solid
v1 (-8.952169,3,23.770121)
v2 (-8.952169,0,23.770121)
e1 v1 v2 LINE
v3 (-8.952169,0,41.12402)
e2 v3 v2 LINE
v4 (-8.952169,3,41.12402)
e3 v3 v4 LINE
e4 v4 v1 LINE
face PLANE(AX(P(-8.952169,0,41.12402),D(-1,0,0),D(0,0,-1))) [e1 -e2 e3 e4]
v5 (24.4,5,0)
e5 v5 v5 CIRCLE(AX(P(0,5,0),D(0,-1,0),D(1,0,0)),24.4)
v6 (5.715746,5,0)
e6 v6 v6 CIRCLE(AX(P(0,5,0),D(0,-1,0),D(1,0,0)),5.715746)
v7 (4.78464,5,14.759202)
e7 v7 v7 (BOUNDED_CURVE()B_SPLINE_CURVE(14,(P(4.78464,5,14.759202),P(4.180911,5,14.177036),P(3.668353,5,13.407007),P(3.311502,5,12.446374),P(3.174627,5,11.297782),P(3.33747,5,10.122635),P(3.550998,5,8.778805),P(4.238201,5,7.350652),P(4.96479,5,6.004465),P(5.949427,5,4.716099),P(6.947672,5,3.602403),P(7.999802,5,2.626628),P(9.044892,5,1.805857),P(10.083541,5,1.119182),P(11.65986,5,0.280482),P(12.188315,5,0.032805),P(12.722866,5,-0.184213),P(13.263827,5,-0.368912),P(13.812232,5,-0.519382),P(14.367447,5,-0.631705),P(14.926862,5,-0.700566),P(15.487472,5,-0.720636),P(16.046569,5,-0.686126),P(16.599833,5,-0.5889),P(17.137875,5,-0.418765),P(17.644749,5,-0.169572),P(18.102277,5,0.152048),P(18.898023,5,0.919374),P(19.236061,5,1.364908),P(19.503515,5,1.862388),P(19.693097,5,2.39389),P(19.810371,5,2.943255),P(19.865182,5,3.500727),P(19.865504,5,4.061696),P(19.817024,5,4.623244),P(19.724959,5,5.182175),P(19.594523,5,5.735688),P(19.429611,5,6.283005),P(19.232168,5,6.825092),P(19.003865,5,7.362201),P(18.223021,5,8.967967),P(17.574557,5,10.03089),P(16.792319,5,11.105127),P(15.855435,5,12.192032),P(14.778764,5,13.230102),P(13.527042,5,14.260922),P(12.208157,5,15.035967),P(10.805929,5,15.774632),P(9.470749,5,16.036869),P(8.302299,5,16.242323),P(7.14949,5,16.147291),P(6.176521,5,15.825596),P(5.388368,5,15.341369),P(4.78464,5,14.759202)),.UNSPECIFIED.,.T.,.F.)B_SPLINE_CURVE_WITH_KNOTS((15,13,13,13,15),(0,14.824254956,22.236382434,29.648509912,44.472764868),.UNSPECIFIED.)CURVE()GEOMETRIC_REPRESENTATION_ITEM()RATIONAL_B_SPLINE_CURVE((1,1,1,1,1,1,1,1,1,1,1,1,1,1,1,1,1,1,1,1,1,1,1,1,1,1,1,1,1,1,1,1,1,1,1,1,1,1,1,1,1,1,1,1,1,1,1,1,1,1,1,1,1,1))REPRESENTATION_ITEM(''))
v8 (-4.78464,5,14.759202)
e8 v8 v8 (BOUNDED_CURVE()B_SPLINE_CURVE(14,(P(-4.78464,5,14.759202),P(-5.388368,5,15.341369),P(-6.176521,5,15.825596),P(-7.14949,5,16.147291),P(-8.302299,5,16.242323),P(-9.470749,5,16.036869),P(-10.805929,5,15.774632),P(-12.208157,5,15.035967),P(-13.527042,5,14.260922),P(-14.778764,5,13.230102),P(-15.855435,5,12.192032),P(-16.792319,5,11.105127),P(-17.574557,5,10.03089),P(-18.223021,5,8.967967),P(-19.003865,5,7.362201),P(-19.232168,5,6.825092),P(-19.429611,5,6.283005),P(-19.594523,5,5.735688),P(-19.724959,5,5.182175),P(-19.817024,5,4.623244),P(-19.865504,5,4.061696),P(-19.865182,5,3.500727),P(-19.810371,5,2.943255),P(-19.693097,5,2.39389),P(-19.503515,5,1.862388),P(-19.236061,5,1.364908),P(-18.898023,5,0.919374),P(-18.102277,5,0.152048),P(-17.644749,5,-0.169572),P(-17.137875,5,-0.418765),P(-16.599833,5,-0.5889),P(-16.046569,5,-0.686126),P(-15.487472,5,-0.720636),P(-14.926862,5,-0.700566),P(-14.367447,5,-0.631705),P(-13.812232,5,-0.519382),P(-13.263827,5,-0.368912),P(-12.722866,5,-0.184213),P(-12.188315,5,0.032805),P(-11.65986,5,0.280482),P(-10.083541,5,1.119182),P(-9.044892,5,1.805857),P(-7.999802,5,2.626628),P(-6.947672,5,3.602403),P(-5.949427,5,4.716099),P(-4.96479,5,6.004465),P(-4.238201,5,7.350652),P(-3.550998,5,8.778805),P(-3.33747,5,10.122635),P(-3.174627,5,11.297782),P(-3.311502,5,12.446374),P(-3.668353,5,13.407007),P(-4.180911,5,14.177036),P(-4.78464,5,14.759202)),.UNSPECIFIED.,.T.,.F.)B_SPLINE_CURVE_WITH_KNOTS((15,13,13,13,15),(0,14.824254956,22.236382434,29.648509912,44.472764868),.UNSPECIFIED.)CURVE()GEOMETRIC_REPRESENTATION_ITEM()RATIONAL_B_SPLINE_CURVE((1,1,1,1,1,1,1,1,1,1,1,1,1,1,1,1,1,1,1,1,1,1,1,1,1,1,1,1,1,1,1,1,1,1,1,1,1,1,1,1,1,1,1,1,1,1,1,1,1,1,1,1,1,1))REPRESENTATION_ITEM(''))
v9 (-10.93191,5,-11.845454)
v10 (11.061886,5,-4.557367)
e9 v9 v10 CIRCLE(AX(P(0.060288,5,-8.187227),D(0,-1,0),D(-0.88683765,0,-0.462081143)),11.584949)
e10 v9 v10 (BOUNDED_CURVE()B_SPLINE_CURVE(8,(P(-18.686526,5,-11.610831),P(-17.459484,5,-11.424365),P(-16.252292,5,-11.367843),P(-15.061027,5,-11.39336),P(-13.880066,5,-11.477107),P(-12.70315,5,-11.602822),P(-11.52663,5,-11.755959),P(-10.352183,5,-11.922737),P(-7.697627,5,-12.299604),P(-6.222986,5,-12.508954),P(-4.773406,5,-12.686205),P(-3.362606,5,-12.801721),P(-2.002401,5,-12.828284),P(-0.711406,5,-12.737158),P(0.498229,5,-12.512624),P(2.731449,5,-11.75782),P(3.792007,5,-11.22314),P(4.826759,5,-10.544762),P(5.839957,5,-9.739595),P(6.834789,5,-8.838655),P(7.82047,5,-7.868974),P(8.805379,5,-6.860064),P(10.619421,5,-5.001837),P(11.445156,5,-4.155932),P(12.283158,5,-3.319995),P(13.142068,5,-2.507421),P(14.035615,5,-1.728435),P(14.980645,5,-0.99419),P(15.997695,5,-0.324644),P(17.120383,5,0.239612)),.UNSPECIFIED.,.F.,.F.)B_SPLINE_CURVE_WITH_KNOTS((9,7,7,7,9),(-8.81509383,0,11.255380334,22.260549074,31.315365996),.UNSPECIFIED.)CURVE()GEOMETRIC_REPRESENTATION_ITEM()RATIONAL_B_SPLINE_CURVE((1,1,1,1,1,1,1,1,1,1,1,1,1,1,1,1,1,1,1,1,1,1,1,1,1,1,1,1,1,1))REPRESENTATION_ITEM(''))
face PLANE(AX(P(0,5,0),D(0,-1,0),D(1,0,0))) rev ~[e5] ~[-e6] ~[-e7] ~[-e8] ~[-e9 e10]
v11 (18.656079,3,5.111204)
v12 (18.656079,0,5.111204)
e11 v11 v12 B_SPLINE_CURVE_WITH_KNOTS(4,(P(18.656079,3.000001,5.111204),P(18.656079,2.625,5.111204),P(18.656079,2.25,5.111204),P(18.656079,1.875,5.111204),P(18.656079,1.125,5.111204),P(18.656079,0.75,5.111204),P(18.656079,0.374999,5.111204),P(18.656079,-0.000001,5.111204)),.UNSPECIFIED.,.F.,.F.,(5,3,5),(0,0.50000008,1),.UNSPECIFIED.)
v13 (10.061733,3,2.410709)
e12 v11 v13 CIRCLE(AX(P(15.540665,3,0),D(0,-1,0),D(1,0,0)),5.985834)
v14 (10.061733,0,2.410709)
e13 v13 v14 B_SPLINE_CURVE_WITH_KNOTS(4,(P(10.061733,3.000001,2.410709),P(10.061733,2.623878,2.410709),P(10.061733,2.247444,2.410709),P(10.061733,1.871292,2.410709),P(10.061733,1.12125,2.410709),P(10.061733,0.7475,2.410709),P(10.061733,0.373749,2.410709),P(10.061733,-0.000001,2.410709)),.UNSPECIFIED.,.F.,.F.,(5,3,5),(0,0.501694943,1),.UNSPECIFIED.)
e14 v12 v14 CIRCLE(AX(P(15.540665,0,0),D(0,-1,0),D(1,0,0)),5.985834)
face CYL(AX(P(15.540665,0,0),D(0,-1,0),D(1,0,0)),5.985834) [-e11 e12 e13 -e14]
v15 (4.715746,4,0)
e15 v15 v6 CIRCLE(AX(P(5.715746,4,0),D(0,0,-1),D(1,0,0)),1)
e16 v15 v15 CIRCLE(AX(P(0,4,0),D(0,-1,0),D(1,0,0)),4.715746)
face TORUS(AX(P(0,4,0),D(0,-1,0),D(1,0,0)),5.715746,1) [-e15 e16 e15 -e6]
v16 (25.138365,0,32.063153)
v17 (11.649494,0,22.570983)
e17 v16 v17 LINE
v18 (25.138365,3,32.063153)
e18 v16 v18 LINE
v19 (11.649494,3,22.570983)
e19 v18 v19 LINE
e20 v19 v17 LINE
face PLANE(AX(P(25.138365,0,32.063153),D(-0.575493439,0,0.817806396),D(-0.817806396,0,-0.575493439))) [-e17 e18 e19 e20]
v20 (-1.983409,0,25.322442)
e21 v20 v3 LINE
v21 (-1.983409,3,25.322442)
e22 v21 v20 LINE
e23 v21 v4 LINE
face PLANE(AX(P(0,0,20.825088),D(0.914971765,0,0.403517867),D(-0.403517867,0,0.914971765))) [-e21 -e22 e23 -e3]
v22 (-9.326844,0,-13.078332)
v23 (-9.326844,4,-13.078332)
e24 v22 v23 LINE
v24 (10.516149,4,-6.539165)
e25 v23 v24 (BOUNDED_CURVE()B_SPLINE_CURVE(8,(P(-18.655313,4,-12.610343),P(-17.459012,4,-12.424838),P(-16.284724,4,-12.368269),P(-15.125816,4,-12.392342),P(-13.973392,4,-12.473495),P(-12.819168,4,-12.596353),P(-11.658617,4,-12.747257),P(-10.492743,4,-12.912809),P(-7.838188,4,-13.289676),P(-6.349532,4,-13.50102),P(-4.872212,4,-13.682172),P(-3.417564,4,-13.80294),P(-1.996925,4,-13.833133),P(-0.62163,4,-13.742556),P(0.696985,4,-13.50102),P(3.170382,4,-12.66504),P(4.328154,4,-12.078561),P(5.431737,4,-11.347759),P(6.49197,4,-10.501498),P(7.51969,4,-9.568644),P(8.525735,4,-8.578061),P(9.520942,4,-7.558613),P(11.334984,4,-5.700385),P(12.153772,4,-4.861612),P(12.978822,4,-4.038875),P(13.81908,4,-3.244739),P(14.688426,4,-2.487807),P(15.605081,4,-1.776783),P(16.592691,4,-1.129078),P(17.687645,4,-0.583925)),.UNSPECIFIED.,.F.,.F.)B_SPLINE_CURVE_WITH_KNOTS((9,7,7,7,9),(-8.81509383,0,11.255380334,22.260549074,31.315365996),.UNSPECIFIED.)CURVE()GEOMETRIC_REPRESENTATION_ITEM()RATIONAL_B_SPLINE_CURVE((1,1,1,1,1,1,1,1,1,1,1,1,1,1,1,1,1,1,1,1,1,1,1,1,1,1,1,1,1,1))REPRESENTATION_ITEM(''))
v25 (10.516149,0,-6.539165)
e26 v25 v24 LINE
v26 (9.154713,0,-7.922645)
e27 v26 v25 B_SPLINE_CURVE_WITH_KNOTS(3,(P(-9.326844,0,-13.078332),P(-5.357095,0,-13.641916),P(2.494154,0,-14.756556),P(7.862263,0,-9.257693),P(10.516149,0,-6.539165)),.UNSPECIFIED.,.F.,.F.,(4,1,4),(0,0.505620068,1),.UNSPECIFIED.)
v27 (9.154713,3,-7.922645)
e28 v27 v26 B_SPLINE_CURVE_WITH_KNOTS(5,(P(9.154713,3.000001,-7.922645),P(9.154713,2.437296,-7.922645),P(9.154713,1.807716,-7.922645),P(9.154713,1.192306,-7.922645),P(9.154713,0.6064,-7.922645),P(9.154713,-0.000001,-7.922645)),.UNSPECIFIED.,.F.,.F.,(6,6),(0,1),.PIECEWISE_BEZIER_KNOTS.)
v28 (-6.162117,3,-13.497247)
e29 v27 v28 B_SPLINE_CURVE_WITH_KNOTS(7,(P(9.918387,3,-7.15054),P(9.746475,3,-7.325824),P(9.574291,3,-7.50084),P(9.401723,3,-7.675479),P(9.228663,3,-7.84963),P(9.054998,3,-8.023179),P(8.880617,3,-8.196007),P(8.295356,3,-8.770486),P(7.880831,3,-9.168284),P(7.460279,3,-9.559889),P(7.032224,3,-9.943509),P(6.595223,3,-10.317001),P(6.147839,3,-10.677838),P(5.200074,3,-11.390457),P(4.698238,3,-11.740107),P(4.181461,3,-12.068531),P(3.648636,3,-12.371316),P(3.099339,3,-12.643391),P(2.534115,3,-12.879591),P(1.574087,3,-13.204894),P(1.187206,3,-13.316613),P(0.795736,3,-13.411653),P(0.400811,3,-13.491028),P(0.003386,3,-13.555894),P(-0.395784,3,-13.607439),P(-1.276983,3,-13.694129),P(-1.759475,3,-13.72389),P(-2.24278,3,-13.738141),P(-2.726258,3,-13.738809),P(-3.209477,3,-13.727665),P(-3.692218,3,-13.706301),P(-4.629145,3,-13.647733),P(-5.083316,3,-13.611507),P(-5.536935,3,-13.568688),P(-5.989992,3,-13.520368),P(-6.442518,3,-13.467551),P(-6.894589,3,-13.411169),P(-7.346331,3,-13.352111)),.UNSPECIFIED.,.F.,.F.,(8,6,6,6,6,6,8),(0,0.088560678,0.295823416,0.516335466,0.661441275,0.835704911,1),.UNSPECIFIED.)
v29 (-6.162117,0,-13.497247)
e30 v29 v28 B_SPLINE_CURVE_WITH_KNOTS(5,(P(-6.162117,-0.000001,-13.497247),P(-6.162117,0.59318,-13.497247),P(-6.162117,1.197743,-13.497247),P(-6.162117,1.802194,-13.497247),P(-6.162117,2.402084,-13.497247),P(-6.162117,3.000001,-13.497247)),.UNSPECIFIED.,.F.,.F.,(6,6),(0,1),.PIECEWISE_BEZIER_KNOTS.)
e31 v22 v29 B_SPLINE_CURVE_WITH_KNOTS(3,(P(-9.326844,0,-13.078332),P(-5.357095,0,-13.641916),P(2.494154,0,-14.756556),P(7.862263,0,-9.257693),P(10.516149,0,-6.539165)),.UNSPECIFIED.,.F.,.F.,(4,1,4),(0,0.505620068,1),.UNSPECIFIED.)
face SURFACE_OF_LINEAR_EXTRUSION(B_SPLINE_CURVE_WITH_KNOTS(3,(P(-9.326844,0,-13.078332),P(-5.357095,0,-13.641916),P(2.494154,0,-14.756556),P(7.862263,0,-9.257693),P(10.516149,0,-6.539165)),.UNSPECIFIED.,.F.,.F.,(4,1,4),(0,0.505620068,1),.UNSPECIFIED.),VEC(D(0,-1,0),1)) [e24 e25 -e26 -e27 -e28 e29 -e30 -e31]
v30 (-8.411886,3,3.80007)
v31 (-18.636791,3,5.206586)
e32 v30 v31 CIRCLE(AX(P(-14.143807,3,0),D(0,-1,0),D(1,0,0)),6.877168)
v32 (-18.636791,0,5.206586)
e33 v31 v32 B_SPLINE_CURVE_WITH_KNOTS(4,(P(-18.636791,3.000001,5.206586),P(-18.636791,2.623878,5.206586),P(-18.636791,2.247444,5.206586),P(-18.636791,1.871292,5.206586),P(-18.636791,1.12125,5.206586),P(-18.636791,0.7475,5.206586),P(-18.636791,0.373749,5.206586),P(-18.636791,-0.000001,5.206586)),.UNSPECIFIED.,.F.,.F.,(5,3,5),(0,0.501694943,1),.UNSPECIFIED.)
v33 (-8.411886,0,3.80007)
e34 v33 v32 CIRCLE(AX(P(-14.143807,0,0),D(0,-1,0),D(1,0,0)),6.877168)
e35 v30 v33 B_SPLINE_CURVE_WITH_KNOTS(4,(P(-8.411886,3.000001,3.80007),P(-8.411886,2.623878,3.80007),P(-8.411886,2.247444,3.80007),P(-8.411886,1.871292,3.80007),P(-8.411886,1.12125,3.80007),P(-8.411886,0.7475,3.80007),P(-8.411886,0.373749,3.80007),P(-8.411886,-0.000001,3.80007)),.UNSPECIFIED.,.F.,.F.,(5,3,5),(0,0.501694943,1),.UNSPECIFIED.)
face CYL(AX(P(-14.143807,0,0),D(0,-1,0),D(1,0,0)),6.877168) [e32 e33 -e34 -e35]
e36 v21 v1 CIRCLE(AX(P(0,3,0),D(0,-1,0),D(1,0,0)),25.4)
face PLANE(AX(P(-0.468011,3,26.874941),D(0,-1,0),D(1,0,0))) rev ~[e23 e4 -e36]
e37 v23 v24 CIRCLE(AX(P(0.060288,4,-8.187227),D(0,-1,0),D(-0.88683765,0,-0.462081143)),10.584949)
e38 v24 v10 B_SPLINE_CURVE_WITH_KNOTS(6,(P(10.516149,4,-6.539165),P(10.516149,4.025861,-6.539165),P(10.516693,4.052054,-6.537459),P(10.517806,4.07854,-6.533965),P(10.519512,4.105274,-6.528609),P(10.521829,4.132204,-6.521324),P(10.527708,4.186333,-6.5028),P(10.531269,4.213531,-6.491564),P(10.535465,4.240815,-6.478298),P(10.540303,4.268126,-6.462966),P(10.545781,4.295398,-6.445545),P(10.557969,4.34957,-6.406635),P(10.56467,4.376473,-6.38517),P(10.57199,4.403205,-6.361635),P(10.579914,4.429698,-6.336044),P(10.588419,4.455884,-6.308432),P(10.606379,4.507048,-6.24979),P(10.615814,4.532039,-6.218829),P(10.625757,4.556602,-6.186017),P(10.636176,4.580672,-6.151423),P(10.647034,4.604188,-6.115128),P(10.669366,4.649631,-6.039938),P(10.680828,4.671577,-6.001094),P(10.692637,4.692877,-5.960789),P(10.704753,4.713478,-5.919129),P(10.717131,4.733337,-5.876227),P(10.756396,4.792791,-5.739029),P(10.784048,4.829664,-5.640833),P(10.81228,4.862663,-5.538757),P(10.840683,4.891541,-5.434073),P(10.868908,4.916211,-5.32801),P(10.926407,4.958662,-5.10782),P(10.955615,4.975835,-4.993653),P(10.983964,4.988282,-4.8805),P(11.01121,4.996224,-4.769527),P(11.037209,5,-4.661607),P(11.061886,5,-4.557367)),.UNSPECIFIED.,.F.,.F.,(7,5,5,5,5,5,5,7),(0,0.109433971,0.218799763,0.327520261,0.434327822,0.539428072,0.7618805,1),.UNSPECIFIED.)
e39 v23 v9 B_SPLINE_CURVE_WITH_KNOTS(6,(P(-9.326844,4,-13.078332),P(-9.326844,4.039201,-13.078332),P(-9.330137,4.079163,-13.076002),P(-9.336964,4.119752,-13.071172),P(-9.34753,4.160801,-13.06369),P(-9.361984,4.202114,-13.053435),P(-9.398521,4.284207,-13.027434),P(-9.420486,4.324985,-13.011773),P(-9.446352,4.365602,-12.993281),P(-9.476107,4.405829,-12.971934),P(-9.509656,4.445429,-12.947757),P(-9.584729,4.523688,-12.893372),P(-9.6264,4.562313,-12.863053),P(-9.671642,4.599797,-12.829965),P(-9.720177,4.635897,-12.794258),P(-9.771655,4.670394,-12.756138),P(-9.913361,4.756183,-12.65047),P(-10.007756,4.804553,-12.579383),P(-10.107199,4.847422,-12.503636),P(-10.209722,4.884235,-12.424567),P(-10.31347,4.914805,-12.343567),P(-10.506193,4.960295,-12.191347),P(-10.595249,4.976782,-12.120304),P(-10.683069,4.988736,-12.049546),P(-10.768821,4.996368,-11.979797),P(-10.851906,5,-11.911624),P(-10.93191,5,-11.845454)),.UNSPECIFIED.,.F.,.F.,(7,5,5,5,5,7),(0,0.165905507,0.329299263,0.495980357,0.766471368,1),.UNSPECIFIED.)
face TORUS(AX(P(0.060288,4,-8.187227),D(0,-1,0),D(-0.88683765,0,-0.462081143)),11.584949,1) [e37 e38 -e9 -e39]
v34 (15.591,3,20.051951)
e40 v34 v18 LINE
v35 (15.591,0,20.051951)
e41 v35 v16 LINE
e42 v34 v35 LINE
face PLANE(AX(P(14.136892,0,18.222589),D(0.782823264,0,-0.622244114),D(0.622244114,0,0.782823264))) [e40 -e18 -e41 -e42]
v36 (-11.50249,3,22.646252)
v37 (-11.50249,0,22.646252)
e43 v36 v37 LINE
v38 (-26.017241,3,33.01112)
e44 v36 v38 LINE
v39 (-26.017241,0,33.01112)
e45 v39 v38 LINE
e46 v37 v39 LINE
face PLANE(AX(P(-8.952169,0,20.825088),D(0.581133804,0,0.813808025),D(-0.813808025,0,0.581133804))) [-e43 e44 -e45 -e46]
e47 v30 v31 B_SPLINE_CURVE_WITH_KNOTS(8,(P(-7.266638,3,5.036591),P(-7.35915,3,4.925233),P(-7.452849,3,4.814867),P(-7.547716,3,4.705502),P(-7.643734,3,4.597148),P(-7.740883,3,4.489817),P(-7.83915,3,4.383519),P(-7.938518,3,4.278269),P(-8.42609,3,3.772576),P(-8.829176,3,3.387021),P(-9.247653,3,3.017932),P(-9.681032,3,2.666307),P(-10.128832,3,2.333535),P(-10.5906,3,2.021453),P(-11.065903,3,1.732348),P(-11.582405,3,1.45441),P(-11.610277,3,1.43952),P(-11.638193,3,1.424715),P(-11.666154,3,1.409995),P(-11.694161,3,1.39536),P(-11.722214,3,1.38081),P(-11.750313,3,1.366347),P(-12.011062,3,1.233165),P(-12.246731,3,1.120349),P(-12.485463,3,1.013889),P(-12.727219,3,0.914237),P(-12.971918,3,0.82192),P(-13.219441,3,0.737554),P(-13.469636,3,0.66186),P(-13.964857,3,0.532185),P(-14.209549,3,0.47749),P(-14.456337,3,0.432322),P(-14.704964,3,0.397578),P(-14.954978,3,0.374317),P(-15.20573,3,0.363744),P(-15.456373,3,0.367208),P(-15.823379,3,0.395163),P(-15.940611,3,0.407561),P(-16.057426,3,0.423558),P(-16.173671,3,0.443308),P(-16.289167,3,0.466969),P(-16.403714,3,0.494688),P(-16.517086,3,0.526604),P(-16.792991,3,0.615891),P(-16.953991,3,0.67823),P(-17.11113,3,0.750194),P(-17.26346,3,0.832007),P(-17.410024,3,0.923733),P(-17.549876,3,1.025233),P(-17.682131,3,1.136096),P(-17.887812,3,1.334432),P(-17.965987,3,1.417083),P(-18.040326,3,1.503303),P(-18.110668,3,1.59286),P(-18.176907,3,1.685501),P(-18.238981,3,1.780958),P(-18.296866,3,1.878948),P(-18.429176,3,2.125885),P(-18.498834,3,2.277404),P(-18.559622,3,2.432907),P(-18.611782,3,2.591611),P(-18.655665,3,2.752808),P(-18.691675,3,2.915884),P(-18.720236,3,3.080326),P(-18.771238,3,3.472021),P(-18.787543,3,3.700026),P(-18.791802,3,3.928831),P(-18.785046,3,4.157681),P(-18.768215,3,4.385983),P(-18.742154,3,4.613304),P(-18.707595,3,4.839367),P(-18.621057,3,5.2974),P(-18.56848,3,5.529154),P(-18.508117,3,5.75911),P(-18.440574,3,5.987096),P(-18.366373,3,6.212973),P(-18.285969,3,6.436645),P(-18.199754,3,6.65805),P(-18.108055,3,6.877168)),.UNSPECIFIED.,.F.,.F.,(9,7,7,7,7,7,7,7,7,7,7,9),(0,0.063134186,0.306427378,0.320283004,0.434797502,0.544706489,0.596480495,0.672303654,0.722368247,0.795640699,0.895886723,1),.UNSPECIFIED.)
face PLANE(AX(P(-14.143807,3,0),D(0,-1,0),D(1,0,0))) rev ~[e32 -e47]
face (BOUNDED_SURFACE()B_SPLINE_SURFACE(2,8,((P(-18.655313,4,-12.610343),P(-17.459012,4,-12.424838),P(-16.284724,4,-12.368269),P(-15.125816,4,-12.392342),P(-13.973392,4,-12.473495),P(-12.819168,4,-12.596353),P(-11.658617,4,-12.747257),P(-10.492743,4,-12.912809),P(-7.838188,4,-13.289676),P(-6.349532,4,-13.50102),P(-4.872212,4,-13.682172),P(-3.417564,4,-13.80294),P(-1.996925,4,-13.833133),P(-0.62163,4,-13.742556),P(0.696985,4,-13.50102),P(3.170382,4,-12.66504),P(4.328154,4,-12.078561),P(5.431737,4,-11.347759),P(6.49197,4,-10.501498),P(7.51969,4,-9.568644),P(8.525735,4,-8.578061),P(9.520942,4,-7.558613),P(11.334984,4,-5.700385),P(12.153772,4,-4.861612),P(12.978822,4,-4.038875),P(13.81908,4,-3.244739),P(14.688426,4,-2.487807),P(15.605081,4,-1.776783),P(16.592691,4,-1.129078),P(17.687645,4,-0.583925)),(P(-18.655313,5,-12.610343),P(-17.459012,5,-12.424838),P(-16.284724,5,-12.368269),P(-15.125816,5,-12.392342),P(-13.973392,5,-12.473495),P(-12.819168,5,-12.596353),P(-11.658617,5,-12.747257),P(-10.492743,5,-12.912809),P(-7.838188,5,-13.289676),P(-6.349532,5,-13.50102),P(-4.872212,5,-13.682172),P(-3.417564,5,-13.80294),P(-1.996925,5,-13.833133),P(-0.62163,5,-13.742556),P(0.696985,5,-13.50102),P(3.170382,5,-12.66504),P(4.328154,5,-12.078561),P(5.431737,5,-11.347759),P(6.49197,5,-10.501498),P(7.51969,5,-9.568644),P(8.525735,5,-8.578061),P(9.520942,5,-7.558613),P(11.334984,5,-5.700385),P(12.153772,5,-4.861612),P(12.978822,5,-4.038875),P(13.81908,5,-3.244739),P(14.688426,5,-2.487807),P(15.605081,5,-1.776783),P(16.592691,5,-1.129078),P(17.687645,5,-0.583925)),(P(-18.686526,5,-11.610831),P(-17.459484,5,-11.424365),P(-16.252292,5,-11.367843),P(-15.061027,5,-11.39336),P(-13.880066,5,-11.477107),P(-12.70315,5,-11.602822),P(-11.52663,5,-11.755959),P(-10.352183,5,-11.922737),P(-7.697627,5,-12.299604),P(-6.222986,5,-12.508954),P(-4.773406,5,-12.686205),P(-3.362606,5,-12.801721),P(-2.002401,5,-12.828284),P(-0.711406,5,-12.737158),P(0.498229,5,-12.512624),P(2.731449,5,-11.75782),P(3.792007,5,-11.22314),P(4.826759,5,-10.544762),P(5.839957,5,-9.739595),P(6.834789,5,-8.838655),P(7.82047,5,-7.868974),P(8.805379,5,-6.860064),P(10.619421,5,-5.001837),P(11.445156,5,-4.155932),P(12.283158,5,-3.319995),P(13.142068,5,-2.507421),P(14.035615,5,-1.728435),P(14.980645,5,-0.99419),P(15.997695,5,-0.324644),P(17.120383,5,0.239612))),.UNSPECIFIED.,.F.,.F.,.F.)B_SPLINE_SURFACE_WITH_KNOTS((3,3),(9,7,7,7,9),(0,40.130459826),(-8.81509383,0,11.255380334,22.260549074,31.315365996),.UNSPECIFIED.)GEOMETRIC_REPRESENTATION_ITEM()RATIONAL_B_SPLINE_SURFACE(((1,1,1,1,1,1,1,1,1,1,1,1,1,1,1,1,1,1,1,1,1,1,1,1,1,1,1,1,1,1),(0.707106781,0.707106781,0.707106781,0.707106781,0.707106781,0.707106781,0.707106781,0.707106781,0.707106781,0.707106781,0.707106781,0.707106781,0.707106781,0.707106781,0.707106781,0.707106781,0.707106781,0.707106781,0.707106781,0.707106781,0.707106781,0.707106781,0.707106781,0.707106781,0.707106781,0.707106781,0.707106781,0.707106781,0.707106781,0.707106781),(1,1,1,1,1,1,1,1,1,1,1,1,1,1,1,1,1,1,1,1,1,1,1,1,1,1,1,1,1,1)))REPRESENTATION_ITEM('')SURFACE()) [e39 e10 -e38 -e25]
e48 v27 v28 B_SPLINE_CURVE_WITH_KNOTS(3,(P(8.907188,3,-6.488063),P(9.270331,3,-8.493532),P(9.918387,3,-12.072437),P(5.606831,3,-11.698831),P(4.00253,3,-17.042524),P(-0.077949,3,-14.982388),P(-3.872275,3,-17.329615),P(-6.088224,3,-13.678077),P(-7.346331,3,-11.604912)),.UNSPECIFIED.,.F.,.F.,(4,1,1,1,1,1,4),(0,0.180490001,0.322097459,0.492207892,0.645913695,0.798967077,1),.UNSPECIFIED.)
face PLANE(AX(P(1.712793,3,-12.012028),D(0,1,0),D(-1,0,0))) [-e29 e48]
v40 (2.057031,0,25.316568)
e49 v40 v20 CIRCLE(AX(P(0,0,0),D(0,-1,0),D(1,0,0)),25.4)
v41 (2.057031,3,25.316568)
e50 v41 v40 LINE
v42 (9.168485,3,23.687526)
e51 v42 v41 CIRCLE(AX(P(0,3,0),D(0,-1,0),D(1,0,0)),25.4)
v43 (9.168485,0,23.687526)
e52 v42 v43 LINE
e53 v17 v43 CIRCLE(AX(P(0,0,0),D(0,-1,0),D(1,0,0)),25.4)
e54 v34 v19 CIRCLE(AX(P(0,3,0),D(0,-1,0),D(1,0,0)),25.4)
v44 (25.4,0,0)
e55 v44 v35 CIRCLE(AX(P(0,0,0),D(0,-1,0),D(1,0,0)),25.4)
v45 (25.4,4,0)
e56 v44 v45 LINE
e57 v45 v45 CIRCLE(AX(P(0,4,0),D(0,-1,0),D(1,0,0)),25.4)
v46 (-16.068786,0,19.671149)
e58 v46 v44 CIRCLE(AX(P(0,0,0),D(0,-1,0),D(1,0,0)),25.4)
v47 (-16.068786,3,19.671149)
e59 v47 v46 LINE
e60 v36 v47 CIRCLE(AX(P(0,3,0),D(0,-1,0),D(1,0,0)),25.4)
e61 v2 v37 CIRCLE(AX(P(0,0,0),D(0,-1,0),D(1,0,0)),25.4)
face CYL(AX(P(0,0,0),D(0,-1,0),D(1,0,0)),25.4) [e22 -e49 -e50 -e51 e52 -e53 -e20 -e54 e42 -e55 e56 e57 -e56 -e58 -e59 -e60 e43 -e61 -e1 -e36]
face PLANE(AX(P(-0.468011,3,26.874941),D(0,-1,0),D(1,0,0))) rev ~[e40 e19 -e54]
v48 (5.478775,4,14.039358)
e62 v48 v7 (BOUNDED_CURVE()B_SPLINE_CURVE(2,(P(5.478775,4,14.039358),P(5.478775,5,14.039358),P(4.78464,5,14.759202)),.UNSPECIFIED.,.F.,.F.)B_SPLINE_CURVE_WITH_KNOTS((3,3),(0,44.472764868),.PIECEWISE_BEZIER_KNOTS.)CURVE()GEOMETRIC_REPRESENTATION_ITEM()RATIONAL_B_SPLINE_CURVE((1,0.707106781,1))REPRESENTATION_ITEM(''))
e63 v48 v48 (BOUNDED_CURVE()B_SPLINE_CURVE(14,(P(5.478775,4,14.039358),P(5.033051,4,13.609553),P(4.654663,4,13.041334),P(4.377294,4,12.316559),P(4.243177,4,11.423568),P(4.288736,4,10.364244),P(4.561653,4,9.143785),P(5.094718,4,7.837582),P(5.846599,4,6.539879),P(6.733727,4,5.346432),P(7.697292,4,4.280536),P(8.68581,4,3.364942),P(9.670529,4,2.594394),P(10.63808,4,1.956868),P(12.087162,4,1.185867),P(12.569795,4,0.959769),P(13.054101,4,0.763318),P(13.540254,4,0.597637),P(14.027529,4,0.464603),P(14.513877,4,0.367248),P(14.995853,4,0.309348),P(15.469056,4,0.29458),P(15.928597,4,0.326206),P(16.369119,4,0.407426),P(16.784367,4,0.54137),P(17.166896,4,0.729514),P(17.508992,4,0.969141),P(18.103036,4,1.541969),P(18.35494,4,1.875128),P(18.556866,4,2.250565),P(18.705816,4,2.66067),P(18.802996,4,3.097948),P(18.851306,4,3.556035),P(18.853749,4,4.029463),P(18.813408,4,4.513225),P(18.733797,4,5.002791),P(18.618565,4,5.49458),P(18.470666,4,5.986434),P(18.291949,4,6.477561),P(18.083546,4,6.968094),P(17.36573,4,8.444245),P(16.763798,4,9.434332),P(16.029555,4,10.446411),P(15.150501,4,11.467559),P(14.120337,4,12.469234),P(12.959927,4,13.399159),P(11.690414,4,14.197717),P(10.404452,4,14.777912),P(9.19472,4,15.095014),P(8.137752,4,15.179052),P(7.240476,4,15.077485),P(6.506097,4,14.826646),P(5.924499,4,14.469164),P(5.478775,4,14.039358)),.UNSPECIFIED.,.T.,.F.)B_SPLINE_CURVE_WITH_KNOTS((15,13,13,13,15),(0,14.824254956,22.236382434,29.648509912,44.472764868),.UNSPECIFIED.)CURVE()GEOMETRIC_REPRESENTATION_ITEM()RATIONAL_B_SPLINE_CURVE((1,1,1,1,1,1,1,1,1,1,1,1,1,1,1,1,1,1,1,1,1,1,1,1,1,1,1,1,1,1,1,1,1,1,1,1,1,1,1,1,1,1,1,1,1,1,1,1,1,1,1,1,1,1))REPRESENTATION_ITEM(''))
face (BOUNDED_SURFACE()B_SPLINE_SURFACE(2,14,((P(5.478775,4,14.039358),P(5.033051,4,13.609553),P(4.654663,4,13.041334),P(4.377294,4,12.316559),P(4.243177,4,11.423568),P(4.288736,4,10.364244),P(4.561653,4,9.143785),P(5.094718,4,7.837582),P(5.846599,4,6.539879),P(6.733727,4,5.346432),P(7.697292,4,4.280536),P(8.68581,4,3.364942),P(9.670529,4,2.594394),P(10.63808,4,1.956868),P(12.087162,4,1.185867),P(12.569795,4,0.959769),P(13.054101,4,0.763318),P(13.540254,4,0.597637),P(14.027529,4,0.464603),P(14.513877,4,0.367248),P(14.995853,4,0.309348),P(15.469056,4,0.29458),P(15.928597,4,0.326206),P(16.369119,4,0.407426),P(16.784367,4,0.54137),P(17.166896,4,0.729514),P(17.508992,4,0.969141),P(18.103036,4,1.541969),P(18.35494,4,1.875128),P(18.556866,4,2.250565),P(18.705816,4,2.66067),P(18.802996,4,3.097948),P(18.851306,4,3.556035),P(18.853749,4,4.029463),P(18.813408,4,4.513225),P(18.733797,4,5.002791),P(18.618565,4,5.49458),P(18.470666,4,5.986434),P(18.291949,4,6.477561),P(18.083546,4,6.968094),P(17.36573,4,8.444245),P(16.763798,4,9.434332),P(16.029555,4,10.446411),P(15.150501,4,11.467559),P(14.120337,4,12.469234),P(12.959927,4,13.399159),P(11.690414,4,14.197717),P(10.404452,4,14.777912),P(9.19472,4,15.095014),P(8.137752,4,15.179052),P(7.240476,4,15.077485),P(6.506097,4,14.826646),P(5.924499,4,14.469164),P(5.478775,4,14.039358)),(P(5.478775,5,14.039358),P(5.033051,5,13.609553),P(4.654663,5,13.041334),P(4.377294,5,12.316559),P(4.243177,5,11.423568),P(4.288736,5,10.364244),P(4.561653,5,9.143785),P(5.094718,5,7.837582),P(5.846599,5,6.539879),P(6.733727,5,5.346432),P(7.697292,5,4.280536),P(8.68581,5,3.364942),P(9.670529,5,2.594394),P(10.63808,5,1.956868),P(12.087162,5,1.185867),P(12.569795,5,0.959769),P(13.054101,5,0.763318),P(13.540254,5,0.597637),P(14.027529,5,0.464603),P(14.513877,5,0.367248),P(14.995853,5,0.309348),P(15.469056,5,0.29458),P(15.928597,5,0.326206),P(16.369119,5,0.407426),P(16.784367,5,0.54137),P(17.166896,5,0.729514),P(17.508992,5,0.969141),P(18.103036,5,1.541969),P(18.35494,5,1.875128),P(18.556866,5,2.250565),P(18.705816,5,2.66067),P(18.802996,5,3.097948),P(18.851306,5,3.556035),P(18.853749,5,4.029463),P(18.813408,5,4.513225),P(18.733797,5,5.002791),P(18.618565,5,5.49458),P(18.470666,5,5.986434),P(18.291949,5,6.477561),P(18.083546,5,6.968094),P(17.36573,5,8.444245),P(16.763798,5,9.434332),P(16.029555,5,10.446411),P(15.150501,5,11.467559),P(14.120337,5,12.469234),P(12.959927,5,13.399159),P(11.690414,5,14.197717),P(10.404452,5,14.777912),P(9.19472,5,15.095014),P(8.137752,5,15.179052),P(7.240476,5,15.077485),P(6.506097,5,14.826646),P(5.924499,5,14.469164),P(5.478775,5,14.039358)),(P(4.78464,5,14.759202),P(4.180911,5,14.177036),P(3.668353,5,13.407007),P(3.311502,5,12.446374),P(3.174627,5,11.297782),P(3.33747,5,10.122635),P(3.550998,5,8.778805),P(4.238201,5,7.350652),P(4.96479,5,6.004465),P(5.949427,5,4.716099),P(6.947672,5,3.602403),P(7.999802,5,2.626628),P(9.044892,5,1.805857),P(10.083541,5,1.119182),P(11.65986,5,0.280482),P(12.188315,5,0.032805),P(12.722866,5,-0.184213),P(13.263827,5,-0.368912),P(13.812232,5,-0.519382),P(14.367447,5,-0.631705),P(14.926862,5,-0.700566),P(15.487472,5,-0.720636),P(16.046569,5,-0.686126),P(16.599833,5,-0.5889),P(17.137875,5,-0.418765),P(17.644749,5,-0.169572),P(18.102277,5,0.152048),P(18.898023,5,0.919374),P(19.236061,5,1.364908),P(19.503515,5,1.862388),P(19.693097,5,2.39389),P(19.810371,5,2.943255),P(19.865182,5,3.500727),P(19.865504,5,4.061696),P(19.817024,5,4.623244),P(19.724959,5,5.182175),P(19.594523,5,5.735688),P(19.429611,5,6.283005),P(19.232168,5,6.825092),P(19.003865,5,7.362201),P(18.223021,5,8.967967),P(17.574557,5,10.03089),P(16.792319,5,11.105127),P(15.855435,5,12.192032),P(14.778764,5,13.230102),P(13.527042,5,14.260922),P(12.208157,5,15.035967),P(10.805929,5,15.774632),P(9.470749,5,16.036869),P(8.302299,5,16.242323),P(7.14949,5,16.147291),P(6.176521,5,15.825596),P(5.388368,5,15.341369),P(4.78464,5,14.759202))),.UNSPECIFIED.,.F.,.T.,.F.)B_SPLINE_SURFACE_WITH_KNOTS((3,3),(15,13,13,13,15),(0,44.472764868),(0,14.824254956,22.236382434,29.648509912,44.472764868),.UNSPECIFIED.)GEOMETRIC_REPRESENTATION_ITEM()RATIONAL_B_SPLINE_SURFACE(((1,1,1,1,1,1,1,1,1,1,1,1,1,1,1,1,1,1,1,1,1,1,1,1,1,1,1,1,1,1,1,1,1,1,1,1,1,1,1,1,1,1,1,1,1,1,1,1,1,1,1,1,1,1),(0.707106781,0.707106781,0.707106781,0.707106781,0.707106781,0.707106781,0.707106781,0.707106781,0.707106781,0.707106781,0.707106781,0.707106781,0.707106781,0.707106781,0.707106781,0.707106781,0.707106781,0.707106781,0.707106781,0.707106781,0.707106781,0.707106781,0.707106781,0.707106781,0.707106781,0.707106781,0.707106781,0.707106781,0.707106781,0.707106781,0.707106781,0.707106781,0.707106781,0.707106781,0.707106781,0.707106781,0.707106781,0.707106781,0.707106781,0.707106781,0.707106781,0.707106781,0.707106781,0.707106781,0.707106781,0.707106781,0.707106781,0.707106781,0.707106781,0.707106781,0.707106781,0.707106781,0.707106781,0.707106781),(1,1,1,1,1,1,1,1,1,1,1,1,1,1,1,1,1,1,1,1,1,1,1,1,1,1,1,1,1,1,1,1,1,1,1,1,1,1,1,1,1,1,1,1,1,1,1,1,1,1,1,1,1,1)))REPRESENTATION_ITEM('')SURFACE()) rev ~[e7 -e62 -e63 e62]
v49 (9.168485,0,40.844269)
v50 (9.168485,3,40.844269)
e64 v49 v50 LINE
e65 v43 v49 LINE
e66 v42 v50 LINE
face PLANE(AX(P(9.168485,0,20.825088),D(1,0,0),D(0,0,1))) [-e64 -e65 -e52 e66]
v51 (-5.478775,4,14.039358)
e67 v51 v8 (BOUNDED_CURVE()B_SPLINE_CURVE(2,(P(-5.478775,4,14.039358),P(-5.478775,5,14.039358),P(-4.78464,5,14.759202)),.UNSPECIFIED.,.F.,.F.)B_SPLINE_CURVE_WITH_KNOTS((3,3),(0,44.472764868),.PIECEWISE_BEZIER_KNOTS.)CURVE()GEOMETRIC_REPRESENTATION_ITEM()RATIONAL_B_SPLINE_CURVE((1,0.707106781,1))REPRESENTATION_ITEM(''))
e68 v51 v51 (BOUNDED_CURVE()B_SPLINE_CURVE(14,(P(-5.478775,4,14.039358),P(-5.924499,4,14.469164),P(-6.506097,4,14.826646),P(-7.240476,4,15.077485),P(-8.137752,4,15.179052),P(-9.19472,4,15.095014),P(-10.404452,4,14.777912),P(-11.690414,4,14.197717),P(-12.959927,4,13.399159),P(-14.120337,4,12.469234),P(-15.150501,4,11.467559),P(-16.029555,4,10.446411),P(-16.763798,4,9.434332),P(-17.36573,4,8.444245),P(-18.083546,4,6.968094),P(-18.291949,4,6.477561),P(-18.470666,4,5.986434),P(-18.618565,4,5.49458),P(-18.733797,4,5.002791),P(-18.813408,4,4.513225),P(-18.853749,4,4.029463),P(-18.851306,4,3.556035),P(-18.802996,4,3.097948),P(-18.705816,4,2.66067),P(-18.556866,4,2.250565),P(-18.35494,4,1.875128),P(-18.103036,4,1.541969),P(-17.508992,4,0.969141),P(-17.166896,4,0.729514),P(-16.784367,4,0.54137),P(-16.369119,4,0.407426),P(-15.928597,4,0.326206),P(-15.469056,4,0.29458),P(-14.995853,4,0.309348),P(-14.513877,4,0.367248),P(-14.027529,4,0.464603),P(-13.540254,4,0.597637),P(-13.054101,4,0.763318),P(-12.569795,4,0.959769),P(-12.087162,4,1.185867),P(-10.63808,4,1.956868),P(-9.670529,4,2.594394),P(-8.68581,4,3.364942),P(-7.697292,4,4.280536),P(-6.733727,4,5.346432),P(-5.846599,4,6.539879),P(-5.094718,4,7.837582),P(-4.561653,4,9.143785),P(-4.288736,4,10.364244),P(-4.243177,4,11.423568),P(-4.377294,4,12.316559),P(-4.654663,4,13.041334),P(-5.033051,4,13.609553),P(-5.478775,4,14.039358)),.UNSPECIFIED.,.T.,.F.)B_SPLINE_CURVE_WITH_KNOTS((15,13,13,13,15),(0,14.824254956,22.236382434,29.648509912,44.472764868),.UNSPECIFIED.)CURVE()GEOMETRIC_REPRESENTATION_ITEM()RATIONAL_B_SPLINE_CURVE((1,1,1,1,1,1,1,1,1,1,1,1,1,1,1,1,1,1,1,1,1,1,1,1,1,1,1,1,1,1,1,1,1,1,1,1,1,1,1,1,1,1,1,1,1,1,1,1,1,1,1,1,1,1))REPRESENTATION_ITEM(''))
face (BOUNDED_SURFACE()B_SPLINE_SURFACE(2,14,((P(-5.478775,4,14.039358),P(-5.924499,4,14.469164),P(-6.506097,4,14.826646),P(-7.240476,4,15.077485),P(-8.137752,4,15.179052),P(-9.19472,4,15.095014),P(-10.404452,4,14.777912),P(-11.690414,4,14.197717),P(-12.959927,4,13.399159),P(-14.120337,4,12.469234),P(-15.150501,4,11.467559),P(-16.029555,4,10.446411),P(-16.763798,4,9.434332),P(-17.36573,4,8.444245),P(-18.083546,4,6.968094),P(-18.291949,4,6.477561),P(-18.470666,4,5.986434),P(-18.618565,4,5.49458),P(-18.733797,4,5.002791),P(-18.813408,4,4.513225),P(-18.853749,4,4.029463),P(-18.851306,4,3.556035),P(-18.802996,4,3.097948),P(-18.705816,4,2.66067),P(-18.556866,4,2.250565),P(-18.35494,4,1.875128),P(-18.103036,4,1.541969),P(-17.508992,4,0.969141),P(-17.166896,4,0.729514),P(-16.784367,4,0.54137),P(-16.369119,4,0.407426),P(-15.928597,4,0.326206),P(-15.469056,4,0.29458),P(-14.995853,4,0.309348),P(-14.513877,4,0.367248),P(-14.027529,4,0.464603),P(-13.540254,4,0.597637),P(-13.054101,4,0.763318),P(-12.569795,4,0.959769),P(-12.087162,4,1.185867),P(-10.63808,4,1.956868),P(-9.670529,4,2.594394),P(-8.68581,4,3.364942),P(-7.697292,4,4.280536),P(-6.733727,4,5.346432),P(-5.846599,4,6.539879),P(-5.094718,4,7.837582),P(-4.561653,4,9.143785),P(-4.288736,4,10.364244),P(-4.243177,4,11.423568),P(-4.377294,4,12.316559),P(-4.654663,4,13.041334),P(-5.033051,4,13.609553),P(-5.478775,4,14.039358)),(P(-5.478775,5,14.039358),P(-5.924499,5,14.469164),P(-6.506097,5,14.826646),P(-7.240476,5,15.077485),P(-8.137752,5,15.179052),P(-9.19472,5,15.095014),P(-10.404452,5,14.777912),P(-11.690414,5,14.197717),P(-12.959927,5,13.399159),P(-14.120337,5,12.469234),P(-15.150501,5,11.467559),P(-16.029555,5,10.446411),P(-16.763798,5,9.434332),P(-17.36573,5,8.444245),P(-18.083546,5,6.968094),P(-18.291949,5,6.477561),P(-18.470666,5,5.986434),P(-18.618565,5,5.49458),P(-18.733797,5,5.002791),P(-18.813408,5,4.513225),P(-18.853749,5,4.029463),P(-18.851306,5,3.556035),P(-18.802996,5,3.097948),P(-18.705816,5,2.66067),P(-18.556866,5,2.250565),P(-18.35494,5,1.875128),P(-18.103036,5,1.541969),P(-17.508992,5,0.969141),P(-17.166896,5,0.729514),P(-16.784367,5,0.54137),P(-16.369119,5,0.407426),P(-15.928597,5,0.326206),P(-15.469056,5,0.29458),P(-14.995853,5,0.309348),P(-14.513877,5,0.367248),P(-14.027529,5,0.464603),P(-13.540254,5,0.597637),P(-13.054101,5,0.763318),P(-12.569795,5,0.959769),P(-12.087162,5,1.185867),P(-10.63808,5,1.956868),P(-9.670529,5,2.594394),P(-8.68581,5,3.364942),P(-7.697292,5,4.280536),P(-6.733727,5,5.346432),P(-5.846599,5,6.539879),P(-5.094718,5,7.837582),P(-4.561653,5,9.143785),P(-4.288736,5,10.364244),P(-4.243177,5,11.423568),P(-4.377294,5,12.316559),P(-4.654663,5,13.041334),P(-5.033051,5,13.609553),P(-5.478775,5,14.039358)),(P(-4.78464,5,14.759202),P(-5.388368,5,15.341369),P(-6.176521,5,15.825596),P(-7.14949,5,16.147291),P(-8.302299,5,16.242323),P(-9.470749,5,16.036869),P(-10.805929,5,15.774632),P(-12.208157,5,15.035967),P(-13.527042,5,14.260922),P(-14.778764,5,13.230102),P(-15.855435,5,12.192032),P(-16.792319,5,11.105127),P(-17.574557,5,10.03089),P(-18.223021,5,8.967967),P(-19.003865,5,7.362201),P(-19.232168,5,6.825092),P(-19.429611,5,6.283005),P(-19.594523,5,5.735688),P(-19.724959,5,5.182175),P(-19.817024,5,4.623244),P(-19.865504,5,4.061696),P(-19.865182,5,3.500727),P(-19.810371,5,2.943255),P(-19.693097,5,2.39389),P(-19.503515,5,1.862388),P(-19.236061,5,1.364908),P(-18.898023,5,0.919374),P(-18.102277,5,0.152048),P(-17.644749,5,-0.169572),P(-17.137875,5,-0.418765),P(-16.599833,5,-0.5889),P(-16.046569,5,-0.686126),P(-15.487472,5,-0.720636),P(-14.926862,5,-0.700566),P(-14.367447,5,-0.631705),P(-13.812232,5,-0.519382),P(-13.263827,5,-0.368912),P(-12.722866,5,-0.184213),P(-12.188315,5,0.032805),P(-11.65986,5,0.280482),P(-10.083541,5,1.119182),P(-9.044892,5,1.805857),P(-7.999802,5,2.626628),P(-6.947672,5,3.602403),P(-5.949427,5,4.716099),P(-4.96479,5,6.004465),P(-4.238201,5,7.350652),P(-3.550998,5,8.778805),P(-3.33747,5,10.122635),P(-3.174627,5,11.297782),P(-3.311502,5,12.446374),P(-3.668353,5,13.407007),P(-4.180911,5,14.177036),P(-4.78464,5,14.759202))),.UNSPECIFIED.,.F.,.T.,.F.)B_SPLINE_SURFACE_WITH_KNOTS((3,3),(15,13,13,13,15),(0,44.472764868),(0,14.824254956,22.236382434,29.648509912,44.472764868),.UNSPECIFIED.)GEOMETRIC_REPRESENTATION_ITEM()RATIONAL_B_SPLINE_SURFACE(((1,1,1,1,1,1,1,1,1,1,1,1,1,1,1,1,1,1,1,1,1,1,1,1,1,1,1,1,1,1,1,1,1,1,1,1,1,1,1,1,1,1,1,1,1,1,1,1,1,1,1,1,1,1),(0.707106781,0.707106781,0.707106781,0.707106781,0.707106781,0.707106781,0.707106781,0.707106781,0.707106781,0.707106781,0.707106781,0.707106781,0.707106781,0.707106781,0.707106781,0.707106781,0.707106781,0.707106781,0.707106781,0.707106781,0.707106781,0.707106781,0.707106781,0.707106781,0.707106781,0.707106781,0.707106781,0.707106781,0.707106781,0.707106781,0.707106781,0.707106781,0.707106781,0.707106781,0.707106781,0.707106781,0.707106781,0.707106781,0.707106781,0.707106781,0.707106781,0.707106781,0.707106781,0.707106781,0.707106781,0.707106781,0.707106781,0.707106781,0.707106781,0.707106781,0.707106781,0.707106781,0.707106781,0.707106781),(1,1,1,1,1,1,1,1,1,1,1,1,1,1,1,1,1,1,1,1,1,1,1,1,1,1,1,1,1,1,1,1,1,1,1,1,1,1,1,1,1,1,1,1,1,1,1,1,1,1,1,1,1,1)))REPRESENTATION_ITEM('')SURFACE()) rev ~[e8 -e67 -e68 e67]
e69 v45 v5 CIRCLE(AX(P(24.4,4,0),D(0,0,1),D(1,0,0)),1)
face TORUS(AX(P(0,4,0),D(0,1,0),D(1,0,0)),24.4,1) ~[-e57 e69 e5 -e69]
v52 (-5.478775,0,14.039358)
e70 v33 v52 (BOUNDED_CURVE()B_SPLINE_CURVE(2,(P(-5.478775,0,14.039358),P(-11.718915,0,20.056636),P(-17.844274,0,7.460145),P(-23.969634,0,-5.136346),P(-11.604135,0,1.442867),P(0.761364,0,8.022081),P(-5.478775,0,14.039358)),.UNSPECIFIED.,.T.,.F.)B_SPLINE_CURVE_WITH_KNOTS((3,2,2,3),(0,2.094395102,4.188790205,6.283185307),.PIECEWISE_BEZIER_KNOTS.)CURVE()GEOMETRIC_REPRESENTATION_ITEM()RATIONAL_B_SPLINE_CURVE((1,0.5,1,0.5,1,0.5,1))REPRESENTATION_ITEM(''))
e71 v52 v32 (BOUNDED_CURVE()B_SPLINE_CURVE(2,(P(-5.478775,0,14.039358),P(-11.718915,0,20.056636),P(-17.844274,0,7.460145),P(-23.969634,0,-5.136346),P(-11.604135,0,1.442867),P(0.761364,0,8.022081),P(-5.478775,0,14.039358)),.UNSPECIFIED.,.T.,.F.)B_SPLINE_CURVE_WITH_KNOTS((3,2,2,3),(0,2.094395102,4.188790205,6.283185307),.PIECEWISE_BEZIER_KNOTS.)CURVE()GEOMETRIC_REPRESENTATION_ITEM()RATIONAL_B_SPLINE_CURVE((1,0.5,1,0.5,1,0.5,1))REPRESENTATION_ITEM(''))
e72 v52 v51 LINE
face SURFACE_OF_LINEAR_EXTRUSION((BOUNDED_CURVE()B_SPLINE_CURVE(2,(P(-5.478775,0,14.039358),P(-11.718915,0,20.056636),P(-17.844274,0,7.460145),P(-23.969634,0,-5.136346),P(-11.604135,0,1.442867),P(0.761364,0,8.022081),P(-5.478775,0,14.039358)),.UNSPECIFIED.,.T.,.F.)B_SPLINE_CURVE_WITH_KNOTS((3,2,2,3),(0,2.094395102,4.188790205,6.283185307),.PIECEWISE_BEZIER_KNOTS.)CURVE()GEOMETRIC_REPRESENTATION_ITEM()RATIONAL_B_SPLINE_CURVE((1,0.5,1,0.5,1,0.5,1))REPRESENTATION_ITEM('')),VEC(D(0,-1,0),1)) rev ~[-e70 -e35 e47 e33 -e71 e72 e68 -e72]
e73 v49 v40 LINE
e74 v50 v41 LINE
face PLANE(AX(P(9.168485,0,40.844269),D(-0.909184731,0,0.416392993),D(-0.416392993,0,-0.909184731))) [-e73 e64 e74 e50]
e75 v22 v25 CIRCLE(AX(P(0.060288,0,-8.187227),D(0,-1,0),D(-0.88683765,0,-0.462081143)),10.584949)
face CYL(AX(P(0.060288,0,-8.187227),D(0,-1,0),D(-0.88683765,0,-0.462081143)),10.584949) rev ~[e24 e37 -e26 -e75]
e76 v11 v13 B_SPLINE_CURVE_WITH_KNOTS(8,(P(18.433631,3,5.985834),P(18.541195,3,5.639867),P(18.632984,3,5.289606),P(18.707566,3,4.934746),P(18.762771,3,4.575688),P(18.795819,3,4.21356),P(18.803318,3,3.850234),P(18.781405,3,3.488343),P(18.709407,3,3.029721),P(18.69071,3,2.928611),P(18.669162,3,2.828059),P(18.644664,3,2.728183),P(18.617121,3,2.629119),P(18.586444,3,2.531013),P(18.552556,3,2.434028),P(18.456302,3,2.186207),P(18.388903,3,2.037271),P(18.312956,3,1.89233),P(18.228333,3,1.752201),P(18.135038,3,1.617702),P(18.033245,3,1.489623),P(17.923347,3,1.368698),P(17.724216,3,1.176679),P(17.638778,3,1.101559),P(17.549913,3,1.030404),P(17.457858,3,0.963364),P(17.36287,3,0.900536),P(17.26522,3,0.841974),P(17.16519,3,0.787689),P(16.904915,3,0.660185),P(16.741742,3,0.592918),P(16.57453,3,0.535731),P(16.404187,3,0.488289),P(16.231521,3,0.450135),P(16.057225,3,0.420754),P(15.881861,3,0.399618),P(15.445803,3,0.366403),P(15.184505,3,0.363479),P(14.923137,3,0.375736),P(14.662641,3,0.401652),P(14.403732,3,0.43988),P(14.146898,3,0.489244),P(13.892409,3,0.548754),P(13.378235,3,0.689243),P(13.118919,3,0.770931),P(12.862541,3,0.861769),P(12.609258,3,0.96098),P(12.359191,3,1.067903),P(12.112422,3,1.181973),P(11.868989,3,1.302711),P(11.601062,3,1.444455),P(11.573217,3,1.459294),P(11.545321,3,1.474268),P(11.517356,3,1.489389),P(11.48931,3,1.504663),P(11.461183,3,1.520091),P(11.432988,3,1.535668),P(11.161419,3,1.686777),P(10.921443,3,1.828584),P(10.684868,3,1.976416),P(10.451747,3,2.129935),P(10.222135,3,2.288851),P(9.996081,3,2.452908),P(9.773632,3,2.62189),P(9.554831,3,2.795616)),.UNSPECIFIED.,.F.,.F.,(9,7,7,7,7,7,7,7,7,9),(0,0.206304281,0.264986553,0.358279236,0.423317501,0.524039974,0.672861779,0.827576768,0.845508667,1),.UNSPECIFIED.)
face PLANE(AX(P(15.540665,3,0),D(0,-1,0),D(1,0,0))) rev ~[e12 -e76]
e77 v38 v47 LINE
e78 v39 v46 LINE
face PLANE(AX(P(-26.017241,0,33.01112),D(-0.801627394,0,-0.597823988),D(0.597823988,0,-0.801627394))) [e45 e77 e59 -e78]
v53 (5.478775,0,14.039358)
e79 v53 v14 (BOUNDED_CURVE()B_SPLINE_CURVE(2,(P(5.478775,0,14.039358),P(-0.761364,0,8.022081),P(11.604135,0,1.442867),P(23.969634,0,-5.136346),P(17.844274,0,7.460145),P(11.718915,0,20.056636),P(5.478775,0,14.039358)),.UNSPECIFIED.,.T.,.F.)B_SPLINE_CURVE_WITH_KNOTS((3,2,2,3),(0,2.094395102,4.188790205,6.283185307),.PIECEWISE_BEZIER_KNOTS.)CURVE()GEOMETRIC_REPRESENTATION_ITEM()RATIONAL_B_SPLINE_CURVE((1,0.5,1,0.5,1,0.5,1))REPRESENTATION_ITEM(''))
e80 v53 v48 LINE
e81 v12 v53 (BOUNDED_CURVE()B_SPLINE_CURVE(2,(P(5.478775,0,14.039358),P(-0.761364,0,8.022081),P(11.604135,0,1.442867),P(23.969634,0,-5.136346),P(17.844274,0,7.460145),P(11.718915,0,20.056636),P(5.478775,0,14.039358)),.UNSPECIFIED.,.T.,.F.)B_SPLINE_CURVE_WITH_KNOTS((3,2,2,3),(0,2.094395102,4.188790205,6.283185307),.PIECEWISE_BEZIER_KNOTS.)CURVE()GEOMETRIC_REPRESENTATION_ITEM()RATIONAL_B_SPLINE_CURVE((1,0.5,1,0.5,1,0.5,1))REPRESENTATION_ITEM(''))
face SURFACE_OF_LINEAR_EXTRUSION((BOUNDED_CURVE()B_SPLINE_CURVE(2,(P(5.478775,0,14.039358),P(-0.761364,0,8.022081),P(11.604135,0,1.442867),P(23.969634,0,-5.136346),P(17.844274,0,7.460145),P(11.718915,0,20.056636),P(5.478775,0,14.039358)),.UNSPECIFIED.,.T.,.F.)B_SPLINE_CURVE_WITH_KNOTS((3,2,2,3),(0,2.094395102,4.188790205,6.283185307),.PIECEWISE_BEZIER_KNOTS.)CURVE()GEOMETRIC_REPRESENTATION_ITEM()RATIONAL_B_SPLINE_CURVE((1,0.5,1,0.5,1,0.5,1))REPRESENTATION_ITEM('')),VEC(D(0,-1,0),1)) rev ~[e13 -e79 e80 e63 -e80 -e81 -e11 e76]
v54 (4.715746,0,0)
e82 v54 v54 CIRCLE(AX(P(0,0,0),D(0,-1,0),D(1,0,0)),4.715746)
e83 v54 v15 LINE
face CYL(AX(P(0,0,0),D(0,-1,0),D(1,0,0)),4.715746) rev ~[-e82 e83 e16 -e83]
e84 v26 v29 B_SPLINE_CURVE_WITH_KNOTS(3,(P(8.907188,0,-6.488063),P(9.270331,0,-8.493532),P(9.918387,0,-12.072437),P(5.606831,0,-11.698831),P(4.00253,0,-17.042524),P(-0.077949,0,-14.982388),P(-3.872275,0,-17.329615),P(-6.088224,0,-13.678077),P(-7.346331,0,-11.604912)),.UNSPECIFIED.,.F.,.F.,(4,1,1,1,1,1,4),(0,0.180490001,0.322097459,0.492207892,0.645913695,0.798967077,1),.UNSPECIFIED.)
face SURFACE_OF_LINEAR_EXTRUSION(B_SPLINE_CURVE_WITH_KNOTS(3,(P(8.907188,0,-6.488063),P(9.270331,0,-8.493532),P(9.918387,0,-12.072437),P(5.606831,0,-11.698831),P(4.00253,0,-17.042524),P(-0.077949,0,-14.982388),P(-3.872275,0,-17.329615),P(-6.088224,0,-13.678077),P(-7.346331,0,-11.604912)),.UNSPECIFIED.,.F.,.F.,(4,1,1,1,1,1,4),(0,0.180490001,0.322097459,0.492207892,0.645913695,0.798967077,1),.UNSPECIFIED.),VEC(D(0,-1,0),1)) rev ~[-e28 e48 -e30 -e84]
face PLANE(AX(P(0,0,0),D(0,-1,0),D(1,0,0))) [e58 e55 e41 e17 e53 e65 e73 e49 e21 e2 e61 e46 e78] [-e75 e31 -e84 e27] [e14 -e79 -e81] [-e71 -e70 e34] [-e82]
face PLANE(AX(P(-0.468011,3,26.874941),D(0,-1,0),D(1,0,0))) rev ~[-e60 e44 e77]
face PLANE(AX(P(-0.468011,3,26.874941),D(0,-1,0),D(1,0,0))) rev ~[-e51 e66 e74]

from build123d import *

# Parameters (mm, degrees)
F0_R     = 25.4
F1_DEPTH = 5
F2_R     = 4.7157463605
F3_DEPTH = 5
F4_R     = 5.9858344823
F4_R_2   = 6.8771684103
F5_DEPTH = 3
F6_R     = 1


# Not quite as in the source:
# - a feature names something its author has since deleted; it is built from what else it names


with BuildPart() as f1:
    # F0 (on Front) → F1 (new body)
    with BuildSketch(Plane.XZ):
        Circle(F0_R)
    extrude(amount=-F1_DEPTH)

    # F2 (on face) → F3 (cut)
    with BuildSketch(Plane.XZ):
        with BuildLine():
            add(Edge.make_bspline(
                [(5.4787751287, 14.0393581241), (-0.7613644186, 8.0220805736), (11.6041345431, 1.4428670645), (23.9696335047, -5.1363464445), (17.8442740904, 7.4601446151), (11.7189146761, 20.0566356747), (5.4787751287, 14.0393581241)],
                knots=[0, 0, 0, 2.0943951024, 2.0943951024, 4.1887902048, 4.1887902048, 6.2831853072, 6.2831853072, 6.2831853072], degree=2, weights=[1, 0.5, 1, 0.5, 1, 0.5, 1]))
        make_face()
        with BuildLine():
            add(Edge.make_bspline(
                [(-5.4787751287, 14.0393581241), (-11.7189146761, 20.0566356747), (-17.8442740904, 7.4601446151), (-23.9696335047, -5.1363464445), (-11.6041345431, 1.4428670645), (0.7613644186, 8.0220805736), (-5.4787751287, 14.0393581241)],
                knots=[0, 0, 0, 2.0943951024, 2.0943951024, 4.1887902048, 4.1887902048, 6.2831853072, 6.2831853072, 6.2831853072], degree=2, weights=[1, 0.5, 1, 0.5, 1, 0.5, 1]))
        make_face()
        with BuildLine():
            add(Edge.make_bspline(
                [(-9.3268435448, -13.0783319473), (-5.3570947234, -13.6419163621), (2.4941538192, -14.7565564853), (7.8622633612, -9.2576925536), (10.5161489919, -6.5391645767)],
                knots=[0, 0, 0, 0, 0.5056200679, 1, 1, 1, 1], degree=3))
            ThreePointArc((-9.3268435448, -13.0783319473), (3.3732506378, -18.2403565311), (10.5161489919, -6.5391645767))
        make_face()
        Circle(F2_R)
    extrude(amount=-F3_DEPTH, mode=Mode.SUBTRACT)

    # F4 (on Front) → F5 (join)
    with BuildSketch(Plane.XZ):
        Polygon((6.3790107723, 19.2006488251), (14.1368918121, 18.2225890458), (25.1383651048, 32.0631526411), (9.1684851795, 20.8250880241), (9.1684851795, 40.8442690969), (0, 20.8250880241), (-8.9521687478, 41.1240197718), (-8.9521687478, 20.8250880241), (-26.0172411799, 33.0111198127), (-13.7080065906, 16.5055599064), (-6.5881432822, 19.6455388269), (0.2679300325, 16.5055599064), align=None)
        with BuildLine():
            add(Edge.make_bspline(
                [(8.9071877301, -6.488062907), (9.2703313456, -8.4935320624), (9.9183873881, -12.0724367943), (5.6068314116, -11.6988309368), (4.0025303305, -17.0425236956), (-0.0779493441, -14.9823882563), (-3.872275032, -17.3296154794), (-6.088223658, -13.6780769927), (-7.3463311419, -11.6049116477)],
                knots=[0, 0, 0, 0, 0.180490001, 0.3220974589, 0.4922078924, 0.6459136955, 0.798967077, 1, 1, 1, 1], degree=3))
            Line((8.9071877301, -6.488062907), (0, -11.6049116477))
            Line((0, -11.6049116477), (-7.3463311419, -11.6049116477))
        make_face()
        with Locations((15.5406650156, 0)):
            Circle(F4_R)
        with Locations((-14.1438068822, 0)):
            Circle(F4_R_2)
    extrude(amount=-F5_DEPTH)

    # F6
    f6_edges = [f1.edges().sort_by_distance(p)[0] for p in [
        (-25.4, 5, 0),
        (1.711486, 5, -13.155),
        (3.373251, 5, -18.240357),
        (-4.715746, 5, 0),
        (-17.806014, 5, 1.255555),
        (17.806014, 5, 1.255555),
    ]]
    fillet(f6_edges, radius=F6_R)


solid = f1.part
